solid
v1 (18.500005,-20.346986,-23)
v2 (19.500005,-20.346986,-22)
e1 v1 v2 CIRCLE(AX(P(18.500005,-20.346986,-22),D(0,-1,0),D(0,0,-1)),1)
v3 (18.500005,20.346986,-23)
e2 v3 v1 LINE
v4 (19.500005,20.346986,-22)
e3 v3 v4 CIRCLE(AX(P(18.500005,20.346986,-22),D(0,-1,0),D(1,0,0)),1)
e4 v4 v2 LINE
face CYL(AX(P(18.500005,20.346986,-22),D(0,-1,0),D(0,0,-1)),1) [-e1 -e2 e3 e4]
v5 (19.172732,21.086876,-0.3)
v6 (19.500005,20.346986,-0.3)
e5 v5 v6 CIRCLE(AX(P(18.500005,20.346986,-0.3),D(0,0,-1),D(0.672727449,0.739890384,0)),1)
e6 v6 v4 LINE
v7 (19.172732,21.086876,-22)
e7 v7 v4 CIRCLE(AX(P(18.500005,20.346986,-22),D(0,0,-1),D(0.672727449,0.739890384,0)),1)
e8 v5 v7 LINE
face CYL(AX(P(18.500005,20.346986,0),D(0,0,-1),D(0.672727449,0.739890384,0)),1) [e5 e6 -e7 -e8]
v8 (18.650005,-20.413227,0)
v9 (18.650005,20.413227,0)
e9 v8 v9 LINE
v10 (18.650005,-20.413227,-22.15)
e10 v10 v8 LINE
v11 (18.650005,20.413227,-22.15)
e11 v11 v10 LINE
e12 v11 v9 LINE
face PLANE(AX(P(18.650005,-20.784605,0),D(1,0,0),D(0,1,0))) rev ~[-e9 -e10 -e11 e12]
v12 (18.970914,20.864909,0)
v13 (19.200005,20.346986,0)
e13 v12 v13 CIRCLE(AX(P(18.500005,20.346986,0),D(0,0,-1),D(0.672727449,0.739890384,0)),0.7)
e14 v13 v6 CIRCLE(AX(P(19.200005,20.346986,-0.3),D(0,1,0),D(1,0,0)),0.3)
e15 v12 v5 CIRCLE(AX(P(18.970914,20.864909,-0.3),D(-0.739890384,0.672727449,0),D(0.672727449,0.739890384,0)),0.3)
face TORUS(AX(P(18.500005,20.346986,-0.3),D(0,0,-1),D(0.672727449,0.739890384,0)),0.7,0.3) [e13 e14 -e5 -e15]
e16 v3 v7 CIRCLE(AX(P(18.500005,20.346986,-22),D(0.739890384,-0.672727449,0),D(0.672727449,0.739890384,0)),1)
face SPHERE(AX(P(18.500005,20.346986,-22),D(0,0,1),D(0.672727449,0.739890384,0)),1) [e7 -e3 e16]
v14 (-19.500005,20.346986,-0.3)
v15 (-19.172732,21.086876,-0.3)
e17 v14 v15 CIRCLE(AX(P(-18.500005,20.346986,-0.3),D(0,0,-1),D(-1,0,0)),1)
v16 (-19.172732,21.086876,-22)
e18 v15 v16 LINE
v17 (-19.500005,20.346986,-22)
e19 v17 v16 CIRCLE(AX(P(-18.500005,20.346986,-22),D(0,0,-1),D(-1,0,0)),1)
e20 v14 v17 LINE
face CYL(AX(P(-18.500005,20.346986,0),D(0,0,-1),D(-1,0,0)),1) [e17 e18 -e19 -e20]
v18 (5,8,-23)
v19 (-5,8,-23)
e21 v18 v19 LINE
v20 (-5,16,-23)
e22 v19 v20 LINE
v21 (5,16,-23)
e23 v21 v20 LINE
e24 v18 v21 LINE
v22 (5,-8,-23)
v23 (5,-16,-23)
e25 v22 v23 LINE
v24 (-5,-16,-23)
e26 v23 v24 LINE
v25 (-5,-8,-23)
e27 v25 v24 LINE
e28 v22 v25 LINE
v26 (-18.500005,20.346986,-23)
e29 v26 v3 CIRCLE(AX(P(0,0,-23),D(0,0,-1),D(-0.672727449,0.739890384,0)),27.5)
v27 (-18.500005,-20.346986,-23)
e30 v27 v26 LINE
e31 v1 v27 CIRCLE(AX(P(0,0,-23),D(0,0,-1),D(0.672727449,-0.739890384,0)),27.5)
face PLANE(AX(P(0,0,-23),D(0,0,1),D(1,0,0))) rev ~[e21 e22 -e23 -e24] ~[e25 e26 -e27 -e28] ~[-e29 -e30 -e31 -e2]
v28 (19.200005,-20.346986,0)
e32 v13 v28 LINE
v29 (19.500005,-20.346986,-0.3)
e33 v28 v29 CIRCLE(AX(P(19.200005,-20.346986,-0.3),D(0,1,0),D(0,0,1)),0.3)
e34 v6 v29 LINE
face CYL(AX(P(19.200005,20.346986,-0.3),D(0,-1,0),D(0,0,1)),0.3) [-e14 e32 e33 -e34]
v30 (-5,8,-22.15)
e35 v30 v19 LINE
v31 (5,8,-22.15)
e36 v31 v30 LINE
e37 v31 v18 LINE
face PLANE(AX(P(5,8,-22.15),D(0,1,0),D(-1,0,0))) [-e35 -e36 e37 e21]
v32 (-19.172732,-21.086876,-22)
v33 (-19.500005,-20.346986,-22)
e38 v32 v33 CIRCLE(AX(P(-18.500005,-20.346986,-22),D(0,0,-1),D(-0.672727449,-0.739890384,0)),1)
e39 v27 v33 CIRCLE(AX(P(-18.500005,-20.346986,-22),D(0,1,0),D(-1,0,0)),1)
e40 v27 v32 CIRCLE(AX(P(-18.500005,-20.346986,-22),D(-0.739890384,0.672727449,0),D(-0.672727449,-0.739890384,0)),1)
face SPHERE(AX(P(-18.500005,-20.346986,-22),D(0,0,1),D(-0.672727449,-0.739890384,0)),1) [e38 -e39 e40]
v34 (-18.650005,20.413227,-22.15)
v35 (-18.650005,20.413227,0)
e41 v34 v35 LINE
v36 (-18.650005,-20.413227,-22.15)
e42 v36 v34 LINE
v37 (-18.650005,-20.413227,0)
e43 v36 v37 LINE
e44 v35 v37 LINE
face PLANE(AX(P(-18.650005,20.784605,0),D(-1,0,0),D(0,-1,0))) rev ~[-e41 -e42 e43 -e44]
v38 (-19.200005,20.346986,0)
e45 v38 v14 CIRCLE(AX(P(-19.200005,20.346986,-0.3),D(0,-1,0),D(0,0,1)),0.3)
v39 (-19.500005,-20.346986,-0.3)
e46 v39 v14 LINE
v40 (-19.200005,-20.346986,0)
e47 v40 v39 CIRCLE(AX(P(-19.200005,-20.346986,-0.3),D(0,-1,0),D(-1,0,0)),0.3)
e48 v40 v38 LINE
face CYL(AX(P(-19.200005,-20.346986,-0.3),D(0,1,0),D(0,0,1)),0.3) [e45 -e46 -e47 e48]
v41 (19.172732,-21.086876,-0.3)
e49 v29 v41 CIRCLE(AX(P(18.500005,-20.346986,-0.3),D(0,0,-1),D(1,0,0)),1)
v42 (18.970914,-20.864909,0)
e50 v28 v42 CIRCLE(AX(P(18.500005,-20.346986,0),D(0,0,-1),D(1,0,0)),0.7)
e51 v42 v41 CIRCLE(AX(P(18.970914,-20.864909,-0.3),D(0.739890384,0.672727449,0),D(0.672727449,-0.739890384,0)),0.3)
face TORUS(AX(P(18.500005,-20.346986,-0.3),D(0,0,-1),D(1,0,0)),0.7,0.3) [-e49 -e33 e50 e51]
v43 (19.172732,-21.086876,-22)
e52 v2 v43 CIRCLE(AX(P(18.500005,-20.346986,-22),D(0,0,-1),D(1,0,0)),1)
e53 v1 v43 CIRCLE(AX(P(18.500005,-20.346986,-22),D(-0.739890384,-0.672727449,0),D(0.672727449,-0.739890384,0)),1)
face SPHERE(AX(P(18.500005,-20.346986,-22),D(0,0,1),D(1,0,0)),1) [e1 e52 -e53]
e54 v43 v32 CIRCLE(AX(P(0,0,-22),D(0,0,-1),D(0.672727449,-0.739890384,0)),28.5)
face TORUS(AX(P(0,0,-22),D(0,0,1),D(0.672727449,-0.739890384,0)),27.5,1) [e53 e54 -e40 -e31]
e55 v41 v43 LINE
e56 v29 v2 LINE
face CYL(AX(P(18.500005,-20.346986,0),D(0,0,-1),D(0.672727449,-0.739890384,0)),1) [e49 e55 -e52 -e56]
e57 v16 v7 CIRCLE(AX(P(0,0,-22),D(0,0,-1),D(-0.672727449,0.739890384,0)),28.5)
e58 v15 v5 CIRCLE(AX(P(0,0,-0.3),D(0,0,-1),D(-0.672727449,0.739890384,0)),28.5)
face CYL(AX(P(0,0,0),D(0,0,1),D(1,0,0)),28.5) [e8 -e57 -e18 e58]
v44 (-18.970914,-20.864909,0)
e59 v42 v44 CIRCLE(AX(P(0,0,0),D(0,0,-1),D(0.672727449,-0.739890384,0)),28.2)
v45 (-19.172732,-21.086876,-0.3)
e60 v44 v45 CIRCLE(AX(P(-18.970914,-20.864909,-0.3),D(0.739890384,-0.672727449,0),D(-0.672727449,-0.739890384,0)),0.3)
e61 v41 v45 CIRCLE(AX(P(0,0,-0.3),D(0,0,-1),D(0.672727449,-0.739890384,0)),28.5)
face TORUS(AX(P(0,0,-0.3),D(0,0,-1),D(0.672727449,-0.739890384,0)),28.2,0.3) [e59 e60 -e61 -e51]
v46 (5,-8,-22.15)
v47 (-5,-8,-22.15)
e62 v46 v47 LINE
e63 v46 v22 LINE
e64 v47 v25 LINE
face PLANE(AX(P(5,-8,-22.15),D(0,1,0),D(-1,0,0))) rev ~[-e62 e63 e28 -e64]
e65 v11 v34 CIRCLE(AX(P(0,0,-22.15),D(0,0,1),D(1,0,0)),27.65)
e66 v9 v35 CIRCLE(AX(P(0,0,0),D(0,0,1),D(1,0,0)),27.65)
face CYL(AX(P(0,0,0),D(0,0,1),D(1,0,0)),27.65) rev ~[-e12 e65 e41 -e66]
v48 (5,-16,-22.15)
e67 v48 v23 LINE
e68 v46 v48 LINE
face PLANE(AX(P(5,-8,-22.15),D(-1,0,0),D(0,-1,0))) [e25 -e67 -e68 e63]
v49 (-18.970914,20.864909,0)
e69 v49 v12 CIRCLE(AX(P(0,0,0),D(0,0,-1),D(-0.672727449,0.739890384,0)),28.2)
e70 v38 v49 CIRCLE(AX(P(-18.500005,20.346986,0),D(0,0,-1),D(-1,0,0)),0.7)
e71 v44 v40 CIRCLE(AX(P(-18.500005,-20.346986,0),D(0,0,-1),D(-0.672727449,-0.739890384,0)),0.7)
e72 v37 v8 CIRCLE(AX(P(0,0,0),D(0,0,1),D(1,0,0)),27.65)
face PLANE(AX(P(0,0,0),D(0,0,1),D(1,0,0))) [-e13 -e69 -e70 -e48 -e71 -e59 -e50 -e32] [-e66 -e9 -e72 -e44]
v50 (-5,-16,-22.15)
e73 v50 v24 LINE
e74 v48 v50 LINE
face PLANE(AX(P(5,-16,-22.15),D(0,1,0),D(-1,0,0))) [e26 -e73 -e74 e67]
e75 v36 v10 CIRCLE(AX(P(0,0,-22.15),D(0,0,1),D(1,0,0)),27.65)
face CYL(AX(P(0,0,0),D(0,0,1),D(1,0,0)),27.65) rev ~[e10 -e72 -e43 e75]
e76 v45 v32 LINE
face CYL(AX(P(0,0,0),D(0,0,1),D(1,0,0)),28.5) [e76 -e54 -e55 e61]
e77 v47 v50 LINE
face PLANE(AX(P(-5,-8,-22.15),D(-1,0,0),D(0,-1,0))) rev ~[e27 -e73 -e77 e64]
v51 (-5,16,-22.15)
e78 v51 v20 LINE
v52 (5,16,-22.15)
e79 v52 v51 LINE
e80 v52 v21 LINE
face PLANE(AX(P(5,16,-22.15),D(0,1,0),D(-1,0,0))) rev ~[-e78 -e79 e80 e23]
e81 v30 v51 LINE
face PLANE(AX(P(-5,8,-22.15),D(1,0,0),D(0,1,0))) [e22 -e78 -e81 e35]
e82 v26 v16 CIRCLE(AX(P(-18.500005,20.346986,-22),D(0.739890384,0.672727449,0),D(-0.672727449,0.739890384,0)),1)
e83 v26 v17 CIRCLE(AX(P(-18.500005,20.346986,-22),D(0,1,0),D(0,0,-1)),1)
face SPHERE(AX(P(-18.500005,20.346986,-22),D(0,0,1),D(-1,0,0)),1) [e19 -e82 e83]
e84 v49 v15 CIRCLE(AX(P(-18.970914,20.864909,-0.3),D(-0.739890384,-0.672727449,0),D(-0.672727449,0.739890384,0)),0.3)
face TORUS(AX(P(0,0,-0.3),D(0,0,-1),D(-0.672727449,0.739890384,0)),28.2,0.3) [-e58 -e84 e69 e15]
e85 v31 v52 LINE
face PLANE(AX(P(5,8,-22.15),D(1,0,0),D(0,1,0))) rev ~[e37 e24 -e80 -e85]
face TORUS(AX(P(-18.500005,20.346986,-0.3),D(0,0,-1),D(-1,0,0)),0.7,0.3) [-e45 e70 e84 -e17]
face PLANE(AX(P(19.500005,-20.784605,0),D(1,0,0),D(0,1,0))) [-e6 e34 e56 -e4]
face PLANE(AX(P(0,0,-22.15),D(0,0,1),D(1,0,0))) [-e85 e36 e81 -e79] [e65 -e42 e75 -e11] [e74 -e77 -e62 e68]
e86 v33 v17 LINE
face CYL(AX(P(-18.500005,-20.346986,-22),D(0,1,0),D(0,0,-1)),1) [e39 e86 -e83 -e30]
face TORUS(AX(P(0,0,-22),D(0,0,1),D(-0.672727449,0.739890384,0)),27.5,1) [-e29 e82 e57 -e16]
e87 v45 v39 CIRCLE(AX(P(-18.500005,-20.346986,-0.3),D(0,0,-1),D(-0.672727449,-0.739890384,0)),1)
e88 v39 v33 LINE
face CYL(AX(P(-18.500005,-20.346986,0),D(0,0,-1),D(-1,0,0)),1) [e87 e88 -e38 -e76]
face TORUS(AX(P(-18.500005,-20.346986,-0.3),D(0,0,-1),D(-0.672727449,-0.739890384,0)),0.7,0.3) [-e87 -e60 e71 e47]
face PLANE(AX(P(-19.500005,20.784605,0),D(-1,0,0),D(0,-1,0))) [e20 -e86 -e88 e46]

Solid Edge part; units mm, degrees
sketch "Sketch1" plane through (0, 0, 0) normal (0, 0, 1) x (1, 0, 0)
  line L0 (-19.5, 20.7846) -> (-19.5, -20.7846)
  arc A0 (19.5, -20.7846) -> (-19.5, -20.7846) centre (0, 0) cw
  line L1 (19.5, -20.7846) -> (19.5, 20.7846)
  arc A1 (-19.5, 20.7846) -> (19.5, 20.7846) centre (0, 0) cw
extrude "Protrusion1" add sketch "Sketch1" against normal blind 23
shell "Thinwall1" thickness 0.85 removed faces 1 at (-13.39, -18.43, 0)
sketch "Sketch2" plane through (0, 0, -22.15) normal (0, 0, 1) x (0, 1, 0)
  line L0 (-16, -5) -> (-16, 5)
  line L1 (-8, 5) -> (-16, 5)
  line L2 (-8, -5) -> (-8, 5)
  line L3 (-8, -5) -> (-16, -5)
  line L4 (8, -5) -> (16, -5)
  line L5 (16, -5) -> (16, 5)
  line L6 (8, 5) -> (16, 5)
  line L7 (8, -5) -> (8, 5)
extrude "Cutout1" cut sketch "Sketch2" against normal blind 41.275
fillet "Round1" radius 1 4 edges at (19.5, -20.7846, -11.5) (19.5, 20.7846, -11.5) (-19.5, 20.7846, -11.5) (-19.5, -20.7846, -11.5)
fillet "Round2" radius 0.3 8 edges at (0, -28.5, 0) (19.4145, -20.7515, 0) (-19.4145, -20.7515, 0) (19.5, 0, 0) (-19.5, 0, 0) (19.4145, 20.7515, 0) (-19.4145, 20.7515, 0) (0, 28.5, 0)
fillet "Round3" radius 1 8 edges at (0, -28.5, -23) (19.4145, -20.7515, -23) (-19.4145, -20.7515, -23) (19.5, 0, -23) (-19.5, 0, -23) (19.4145, 20.7515, -23) (-19.4145, 20.7515, -23) (0, 28.5, -23)
properties material "boot"
